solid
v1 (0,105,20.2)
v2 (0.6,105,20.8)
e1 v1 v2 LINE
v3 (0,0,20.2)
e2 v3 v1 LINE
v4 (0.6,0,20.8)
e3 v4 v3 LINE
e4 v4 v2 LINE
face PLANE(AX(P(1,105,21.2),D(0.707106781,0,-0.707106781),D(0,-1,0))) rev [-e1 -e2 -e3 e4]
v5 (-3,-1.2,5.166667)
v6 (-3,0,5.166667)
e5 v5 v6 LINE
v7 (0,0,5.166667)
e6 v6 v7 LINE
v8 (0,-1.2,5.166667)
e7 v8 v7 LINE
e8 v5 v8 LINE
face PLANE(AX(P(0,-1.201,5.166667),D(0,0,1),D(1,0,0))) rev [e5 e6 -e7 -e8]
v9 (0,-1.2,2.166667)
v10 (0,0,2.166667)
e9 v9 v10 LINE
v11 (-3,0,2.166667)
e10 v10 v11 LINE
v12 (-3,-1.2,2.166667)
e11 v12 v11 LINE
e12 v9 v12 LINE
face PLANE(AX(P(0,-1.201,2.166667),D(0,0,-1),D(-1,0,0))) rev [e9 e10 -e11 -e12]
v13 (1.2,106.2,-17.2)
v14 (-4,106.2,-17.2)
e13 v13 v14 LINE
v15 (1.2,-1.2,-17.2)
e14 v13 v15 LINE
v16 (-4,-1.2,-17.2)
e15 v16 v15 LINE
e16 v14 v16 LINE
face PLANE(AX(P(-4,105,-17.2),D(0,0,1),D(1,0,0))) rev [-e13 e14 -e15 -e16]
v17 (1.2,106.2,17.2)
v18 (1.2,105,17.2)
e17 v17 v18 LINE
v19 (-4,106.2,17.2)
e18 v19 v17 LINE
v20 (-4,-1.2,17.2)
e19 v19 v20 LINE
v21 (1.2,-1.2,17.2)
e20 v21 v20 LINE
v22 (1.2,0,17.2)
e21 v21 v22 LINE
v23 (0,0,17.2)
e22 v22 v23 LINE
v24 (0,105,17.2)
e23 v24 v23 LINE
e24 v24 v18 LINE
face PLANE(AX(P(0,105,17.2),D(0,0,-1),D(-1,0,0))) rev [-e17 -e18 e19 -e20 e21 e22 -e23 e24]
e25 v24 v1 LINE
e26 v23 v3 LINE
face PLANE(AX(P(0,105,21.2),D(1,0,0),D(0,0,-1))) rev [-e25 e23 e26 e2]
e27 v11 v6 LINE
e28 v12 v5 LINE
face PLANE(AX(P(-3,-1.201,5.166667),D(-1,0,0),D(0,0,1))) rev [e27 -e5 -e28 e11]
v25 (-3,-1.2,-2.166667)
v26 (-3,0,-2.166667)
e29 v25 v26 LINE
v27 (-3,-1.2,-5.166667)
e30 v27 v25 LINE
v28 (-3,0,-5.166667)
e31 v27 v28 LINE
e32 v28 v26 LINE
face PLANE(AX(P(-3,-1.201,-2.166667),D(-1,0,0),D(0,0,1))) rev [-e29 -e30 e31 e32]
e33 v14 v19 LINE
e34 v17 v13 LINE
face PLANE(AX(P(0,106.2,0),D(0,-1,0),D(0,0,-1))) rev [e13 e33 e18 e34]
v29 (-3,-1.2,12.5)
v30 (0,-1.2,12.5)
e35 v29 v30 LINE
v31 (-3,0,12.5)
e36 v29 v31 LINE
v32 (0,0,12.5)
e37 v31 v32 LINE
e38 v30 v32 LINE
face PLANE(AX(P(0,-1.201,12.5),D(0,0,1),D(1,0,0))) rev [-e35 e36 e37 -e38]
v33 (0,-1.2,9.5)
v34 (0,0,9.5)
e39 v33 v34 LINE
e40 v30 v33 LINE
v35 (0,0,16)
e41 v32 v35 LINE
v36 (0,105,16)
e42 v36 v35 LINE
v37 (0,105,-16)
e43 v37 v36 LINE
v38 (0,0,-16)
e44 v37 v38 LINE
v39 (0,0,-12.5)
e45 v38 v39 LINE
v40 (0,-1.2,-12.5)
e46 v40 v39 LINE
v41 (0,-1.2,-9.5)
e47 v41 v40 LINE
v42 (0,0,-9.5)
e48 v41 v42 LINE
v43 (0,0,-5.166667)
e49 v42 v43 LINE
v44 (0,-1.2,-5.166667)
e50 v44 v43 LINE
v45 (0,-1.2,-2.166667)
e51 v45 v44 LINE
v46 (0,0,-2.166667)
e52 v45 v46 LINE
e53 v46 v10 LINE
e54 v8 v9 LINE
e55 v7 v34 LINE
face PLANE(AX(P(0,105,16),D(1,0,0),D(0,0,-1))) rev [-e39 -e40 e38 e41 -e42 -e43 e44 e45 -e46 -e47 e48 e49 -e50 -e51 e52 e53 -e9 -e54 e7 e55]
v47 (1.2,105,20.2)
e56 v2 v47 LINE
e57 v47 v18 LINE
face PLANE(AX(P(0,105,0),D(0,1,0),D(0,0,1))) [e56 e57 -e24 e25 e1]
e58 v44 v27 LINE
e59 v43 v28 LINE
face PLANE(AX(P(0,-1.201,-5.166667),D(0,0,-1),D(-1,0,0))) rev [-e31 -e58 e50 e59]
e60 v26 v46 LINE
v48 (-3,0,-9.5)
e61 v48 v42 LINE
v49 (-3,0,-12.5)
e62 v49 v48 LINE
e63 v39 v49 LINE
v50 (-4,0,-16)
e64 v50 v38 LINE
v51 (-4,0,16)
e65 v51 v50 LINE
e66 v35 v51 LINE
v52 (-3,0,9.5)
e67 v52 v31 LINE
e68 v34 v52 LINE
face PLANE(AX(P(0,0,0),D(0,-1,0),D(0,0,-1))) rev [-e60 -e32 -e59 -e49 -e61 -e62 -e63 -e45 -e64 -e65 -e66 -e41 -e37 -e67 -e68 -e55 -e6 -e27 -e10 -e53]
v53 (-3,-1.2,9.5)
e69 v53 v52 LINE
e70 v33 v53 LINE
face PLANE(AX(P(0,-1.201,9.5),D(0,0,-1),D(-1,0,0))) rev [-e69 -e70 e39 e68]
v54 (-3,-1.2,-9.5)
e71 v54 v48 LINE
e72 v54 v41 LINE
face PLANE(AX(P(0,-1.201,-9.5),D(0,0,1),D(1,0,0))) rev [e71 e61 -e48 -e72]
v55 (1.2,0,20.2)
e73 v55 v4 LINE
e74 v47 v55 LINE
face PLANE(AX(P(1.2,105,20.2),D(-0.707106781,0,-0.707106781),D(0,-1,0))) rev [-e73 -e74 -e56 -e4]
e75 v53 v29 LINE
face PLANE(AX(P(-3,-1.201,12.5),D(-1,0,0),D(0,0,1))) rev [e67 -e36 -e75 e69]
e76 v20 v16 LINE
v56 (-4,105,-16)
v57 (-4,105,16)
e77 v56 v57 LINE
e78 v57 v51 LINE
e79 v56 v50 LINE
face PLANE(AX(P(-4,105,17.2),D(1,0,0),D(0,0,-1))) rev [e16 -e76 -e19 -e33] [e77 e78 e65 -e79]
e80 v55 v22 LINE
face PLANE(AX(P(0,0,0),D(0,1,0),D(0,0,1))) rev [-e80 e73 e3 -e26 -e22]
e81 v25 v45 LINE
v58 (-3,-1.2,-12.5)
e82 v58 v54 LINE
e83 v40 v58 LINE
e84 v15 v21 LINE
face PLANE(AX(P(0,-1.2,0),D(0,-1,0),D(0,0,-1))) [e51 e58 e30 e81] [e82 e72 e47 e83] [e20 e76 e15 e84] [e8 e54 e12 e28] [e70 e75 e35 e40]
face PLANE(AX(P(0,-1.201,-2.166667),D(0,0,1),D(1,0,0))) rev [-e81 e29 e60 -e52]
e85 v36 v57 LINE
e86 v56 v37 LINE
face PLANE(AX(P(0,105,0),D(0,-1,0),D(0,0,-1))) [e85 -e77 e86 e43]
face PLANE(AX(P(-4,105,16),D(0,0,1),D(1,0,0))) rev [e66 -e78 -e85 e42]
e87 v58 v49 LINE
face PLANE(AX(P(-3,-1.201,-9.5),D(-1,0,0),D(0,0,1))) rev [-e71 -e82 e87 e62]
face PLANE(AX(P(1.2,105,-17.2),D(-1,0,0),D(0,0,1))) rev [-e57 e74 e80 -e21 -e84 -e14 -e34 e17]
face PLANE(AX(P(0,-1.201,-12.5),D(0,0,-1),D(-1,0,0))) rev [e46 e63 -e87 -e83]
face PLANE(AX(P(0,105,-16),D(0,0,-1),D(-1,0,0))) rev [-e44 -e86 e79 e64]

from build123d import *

# Parameters (mm, degrees)
BOSS_EXTRUDE1_DEPTH = 105
SKETCH2_W           = 5.2
SKETCH2_H           = 34.4
BOSS_EXTRUDE2_DEPTH = 1.2
SKETCH3_W           = 5.2
SKETCH3_H           = 34.4
BOSS_EXTRUDE3_DEPTH = 1.2
CUT_EXTRUDE1_REACH  = 110.369
SKETCH4_W           = 3
SKETCH4_H           = 3
CHAMFER1_SIZE       = 1


with BuildPart() as part:
    # Sketch1 → Boss-Extrude1 (new body)
    with BuildSketch(Plane(origin=(0, 0, 0), x_dir=(1, 0, 0), z_dir=(0, 1, 0))):
        Polygon((0, -16), (0, 16), (-4, 16), (-4, 17.2), (1.2, 17.2), (1.2, -17.2), (1.2, -21.2), (0, -21.2), (0, -17.2), (-4, -17.2), (-4, -16), align=None)
    extrude(amount=BOSS_EXTRUDE1_DEPTH)

    # Sketch2 → Boss-Extrude2 (add)
    with BuildSketch(Plane(origin=(0, 105, 0), x_dir=(1, 0, 0), z_dir=(0, 1, 0))):
        with Locations((-1.4, 0)):
            Rectangle(SKETCH2_W, SKETCH2_H)
    extrude(amount=BOSS_EXTRUDE2_DEPTH)

    # Sketch3 → Boss-Extrude3 (add)
    with BuildSketch(Plane.XZ):
        with Locations((-1.4, 0)):
            Rectangle(SKETCH3_W, SKETCH3_H)
    extrude(amount=BOSS_EXTRUDE3_DEPTH)

    # Sketch4 → Cut-Extrude1 (cut, up to next)
    with BuildSketch(Plane(origin=(0, 0, 0), x_dir=(1, 0, 0), z_dir=(0, 1, 0)), mode=Mode.PRIVATE) as cut_extrude1_sk1:
        with Locations((-1.5, -11)):
            Rectangle(SKETCH4_W, SKETCH4_H)
    cut_extrude1_tool1 = extrude(cut_extrude1_sk1.sketch, amount=-CUT_EXTRUDE1_REACH, mode=Mode.PRIVATE) & part.part
    # Sketch4 → Cut-Extrude1 (cut, up to next)
    with BuildSketch(Plane(origin=(0, 0, 0), x_dir=(1, 0, 0), z_dir=(0, 1, 0)), mode=Mode.PRIVATE) as cut_extrude1_sk2:
        with Locations((-1.5, -3.666666667)):
            Rectangle(SKETCH4_W, SKETCH4_H)
    cut_extrude1_tool2 = extrude(cut_extrude1_sk2.sketch, amount=-CUT_EXTRUDE1_REACH, mode=Mode.PRIVATE) & part.part
    # Sketch4 → Cut-Extrude1 (cut, up to next)
    with BuildSketch(Plane(origin=(0, 0, 0), x_dir=(1, 0, 0), z_dir=(0, 1, 0)), mode=Mode.PRIVATE) as cut_extrude1_sk3:
        with Locations((-1.5, 3.666666667)):
            Rectangle(SKETCH4_W, SKETCH4_H)
    cut_extrude1_tool3 = extrude(cut_extrude1_sk3.sketch, amount=-CUT_EXTRUDE1_REACH, mode=Mode.PRIVATE) & part.part
    # Sketch4 → Cut-Extrude1 (cut, up to next)
    with BuildSketch(Plane(origin=(0, 0, 0), x_dir=(1, 0, 0), z_dir=(0, 1, 0)), mode=Mode.PRIVATE) as cut_extrude1_sk4:
        with Locations((-1.5, 11)):
            Rectangle(SKETCH4_W, SKETCH4_H)
    cut_extrude1_tool4 = extrude(cut_extrude1_sk4.sketch, amount=-CUT_EXTRUDE1_REACH, mode=Mode.PRIVATE) & part.part
    add(cut_extrude1_tool1.solids().sort_by_distance((-1.5, 0, 11))[0], mode=Mode.SUBTRACT)
    add(cut_extrude1_tool2.solids().sort_by_distance((-1.5, 0, 3.666667))[0], mode=Mode.SUBTRACT)
    add(cut_extrude1_tool3.solids().sort_by_distance((-1.5, 0, -3.666667))[0], mode=Mode.SUBTRACT)
    add(cut_extrude1_tool4.solids().sort_by_distance((-1.5, 0, -11))[0], mode=Mode.SUBTRACT)

    # Chamfer1
    # the kernel refuses this chamfer: 1 mm, written as the material it takes off along each edge
    with BuildSketch(Plane(origin=(0, -2.571682988, 21.2), x_dir=(-0.02749587661058639, 0, -0.9996219169112968), z_dir=(0, 1, 0))) as chamfer1_piece_1:
        Polygon((CHAMFER1_SIZE * 0.999621916911, -CHAMFER1_SIZE * 0.0274958766106), (-CHAMFER1_SIZE * 0.0274958766106, -CHAMFER1_SIZE * 0.999621916911), (0, 0), align=None)
    extrude(amount=110.143365976, mode=Mode.SUBTRACT)
    with BuildSketch(Plane(origin=(1.2, -2.571682988, 21.2), x_dir=(0.027495876610586077, 0, -0.9996219169112968), z_dir=(0, 1, 0))) as chamfer1_piece_2:
        Polygon((CHAMFER1_SIZE * 0.999621916911, CHAMFER1_SIZE * 0.0274958766106), (-CHAMFER1_SIZE * 0.0274958766106, CHAMFER1_SIZE * 0.999621916911), (0, 0), align=None)
    extrude(amount=110.143365976, mode=Mode.SUBTRACT)


solid = part.part
